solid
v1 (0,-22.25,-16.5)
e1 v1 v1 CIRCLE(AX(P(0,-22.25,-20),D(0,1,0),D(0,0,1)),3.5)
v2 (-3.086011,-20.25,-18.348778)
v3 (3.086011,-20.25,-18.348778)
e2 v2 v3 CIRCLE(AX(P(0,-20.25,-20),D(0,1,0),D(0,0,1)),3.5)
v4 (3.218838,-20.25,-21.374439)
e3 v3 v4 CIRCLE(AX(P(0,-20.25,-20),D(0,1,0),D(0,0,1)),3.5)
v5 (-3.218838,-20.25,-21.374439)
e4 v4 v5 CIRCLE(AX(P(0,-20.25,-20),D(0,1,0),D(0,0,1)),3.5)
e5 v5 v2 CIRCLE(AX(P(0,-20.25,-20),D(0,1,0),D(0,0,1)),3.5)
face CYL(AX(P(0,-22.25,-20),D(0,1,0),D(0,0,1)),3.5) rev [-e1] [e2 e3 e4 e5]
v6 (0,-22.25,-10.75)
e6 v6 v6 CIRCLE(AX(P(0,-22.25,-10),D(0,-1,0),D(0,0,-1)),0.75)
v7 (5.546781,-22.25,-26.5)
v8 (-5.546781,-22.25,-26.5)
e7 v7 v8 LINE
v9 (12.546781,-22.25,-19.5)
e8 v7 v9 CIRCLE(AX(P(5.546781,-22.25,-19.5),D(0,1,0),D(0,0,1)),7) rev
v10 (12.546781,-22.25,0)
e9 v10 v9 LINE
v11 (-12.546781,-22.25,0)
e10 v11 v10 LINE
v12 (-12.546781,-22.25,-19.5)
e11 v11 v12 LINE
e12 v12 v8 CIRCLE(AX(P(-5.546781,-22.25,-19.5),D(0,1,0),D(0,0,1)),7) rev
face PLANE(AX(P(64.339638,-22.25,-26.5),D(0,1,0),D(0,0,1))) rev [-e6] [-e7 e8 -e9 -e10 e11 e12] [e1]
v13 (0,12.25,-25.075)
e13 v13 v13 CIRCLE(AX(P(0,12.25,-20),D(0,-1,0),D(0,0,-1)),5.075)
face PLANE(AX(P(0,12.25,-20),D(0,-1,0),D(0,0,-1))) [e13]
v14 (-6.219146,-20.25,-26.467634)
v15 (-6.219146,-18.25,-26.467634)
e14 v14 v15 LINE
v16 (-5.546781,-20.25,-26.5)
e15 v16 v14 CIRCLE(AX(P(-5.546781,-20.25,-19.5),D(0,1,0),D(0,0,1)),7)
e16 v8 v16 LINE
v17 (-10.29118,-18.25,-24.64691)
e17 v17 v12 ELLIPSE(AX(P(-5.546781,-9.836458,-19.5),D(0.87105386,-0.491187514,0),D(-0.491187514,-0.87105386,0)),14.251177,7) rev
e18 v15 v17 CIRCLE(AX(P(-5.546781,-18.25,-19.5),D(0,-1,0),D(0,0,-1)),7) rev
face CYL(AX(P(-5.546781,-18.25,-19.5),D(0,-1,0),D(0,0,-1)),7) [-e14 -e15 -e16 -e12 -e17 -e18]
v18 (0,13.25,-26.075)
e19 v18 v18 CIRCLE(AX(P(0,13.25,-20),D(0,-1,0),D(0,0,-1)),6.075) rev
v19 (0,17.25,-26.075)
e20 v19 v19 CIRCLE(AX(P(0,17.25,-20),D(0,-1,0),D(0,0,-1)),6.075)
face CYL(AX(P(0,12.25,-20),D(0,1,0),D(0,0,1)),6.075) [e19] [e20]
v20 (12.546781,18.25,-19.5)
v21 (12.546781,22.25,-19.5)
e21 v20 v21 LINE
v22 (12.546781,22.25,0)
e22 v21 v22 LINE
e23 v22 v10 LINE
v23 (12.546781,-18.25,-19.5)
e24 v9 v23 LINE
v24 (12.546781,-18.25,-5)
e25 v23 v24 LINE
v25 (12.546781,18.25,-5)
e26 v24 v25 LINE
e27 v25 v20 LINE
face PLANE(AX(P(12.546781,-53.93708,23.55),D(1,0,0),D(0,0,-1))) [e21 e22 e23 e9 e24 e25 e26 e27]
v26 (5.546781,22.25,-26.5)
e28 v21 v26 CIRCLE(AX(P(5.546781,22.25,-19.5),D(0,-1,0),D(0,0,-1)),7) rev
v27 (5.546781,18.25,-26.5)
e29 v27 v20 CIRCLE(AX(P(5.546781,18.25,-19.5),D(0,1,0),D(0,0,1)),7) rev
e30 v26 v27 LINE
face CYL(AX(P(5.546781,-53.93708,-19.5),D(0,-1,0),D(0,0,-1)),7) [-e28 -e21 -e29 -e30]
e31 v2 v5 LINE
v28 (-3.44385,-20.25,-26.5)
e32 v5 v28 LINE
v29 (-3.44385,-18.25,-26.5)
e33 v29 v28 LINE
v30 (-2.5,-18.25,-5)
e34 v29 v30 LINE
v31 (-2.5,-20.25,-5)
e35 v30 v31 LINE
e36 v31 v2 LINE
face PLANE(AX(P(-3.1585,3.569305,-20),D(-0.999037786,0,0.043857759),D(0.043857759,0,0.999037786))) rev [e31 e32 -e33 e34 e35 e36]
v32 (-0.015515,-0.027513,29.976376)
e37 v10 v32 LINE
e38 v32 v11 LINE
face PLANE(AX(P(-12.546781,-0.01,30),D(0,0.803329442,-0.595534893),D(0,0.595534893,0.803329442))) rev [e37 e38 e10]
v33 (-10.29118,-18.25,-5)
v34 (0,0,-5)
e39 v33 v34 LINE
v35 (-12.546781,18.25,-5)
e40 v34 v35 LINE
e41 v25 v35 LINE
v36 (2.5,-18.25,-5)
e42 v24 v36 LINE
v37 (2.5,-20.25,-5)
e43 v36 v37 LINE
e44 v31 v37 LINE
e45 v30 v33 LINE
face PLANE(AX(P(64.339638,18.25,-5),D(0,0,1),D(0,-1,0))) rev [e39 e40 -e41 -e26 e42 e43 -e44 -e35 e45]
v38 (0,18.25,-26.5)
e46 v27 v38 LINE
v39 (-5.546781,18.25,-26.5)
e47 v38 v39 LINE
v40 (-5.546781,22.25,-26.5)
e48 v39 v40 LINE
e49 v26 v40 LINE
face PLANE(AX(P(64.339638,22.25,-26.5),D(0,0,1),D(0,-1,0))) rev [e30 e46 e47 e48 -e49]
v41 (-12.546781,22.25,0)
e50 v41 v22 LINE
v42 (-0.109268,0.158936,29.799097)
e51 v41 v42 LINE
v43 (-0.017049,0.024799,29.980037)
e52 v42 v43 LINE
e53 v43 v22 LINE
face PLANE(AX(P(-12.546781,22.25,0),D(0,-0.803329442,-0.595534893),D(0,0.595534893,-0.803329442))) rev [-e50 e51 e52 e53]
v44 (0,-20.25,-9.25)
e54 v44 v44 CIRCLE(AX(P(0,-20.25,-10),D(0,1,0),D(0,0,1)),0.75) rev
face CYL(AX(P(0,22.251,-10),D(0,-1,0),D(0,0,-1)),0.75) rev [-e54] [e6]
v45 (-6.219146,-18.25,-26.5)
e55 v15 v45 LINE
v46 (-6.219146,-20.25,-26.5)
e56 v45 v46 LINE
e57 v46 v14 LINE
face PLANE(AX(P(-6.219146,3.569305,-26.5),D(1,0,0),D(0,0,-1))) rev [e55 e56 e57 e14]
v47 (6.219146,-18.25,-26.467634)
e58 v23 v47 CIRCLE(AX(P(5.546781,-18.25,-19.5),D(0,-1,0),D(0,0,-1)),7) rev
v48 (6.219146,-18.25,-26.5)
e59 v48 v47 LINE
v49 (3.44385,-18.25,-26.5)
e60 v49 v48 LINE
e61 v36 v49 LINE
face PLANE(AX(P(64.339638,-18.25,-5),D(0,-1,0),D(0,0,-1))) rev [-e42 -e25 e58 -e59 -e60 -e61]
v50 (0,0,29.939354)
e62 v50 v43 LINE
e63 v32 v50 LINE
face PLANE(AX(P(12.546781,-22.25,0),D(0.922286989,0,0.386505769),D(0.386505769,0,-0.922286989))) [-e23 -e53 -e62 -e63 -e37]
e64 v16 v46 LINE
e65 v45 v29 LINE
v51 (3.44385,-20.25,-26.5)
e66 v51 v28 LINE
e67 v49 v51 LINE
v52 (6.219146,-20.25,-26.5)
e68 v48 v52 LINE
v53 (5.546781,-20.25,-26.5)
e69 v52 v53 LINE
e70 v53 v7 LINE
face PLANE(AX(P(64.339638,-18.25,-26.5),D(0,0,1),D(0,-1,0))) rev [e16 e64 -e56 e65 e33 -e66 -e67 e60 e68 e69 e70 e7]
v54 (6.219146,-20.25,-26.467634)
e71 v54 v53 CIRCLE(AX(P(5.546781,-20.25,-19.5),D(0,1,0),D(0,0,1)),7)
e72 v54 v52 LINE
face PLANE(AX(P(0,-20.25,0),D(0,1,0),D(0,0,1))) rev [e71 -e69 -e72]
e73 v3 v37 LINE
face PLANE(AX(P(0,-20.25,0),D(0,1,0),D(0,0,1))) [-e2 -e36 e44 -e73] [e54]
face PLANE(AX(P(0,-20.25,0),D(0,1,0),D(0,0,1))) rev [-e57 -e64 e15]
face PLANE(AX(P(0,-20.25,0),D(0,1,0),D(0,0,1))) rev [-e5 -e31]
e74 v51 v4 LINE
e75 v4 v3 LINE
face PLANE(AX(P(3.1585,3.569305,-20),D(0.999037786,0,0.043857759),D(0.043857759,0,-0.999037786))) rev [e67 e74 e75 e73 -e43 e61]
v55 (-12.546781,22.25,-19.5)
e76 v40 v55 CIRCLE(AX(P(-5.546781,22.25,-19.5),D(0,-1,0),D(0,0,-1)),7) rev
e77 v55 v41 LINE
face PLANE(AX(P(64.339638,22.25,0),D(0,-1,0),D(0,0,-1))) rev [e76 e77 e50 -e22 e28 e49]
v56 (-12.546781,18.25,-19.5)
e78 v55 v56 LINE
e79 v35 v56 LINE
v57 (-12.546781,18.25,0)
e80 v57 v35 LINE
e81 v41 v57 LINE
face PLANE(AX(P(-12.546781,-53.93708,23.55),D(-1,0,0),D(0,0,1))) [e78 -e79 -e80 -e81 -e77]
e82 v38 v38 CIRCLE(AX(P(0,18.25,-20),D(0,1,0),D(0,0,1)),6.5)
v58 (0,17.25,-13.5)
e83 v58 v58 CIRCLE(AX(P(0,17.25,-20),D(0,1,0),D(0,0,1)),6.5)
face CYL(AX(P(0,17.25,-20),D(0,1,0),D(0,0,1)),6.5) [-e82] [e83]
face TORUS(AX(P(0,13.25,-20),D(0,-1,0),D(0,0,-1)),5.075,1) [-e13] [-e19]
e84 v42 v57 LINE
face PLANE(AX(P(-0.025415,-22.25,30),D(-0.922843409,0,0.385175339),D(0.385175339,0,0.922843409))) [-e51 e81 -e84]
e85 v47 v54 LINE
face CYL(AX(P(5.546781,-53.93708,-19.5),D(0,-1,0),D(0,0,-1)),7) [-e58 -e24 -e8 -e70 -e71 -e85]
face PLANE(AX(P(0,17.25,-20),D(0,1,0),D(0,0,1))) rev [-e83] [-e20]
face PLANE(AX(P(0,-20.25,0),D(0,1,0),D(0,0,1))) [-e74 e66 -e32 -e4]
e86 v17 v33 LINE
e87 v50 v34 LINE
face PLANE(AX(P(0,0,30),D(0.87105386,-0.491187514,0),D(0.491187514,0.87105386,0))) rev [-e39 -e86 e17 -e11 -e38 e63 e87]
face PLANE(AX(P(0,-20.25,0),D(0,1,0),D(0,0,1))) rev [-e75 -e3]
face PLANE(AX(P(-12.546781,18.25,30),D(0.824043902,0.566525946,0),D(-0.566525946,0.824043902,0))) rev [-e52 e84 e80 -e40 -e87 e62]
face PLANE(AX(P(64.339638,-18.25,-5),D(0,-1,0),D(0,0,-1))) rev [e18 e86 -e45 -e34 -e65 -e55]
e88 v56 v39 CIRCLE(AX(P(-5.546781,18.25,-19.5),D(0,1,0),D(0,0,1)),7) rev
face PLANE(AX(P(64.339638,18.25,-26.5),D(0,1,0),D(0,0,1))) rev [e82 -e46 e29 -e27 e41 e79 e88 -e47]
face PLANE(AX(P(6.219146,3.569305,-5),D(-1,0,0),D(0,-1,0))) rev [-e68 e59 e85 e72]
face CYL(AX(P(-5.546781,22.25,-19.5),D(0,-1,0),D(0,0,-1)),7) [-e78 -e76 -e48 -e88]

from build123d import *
from OCP.BRepFilletAPI import BRepFilletAPI_MakeChamfer

# Parameters (mm, degrees)
SKETCH4_W                = 12.46
SKETCH4_H                = 17.25
BOSS_EXTRUDE3_DEPTH      = 6
BOSS_EXTRUDE6_DEPTH      = 7.3
BOSS_EXTRUDE6_DEPTH_BACK = 17.25
SKETCH8_R                = 12.546781182
SKETCH8_R_2              = 11.15
BOSS_EXTRUDE4_DEPTH      = 17.25
SKETCH6_R                = 2
CUT_EXTRUDE1_DEPTH       = 5
CHAMFER1_SIZE            = 0.5
CHAMFER1_SIZE_2          = 0.866025404
SKETCH10_W               = 12.46
SKETCH10_H               = 23.7
CUT_EXTRUDE3_DEPTH       = 17.25
CUT_EXTRUDE4_REACH       = 43.938
SKETCH11_W               = 5
SKETCH11_H               = 3
BOSS_EXTRUDE7_START      = -7.3
BOSS_EXTRUDE7_DEPTH      = 7.3
BOSS_EXTRUDE9_START      = 10
BOSS_EXTRUDE9_DEPTH      = 10
BOSS_EXTRUDE10_DEPTH     = 25.093562364
SKETCH18_W               = 21.5
SKETCH18_H               = 12.438292938
CUT_EXTRUDE5_DEPTH       = 2
CUT_EXTRUDE6_DEPTH       = 58.154608998
CUT_EXTRUDE6_DEPTH_BACK  = 58.154608998
SKETCH19_R               = 3.5
FILLET1_R                = 7
CUT_EXTRUDE7_DEPTH       = 55.97840444
CUT_EXTRUDE7_DEPTH_BACK  = 55.97840444
SKETCH20_W               = 25.093562364
SKETCH20_H               = 36.096781182
BOSS_EXTRUDE11_DEPTH     = 44.5
CUT_EXTRUDE8_DEPTH       = 40.401576339
CUT_EXTRUDE8_DEPTH_BACK  = 40.401576339
CUT_EXTRUDE9_DEPTH       = 40.401576339
CUT_EXTRUDE9_DEPTH_BACK  = 40.401576339
SKETCH24_R               = 6.5
BOSS_EXTRUDE12_DEPTH     = 5
SKETCH25_R               = 6.075
BOSS_EXTRUDE13_DEPTH     = 5
FILLET2_R                = 1
BOSS_EXTRUDE14_DEPTH     = 2
CUT_EXTRUDE10_REACH      = 57.104
SKETCH27_R               = 0.75


with BuildPart() as part:
    # Sketch4 → Boss-Extrude3 (new body)
    with BuildSketch(Plane.XY):
        with Locations((0, -1.35)):
            Rectangle(SKETCH4_W, SKETCH4_H)
    extrude(amount=BOSS_EXTRUDE3_DEPTH)



with BuildPart() as body_2:
    # Sketch8 → Boss-Extrude6 (new, two sides: drawn at the far end of the back side and taken through both)
    with BuildSketch(Plane(origin=(0, -9.975, 0), x_dir=(-1, 0, 0), z_dir=(0, -1, 0)).offset(-BOSS_EXTRUDE6_DEPTH_BACK)):
        with Locations(Location((0, -23.55, 0), (0, 0, 90))):
            Circle(SKETCH8_R)
        with Locations(Location((0, -23.55, 0), (0, 0, 90))):
            Circle(SKETCH8_R_2, mode=Mode.SUBTRACT)
    extrude(amount=BOSS_EXTRUDE6_DEPTH + BOSS_EXTRUDE6_DEPTH_BACK)


with BuildPart() as part_1:
    add(part.part)

    add(body_2.part)  # Boss-Extrude4 merges body 2
    # Sketch5 → Boss-Extrude4 (add)
    with BuildSketch(Plane(origin=(0, 7.275, 0), x_dir=(1, 0, 0), z_dir=(0, 1, 0))):
        with BuildLine():
            Line((12.546781182, -23.55), (12.546781182, 0))
            Line((12.546781182, 0), (6.23, 0))
            Line((6.23, 0), (6.23, -29.7))
            Line((6.23, -29.7), (-6.23, -29.7))
            Line((-6.23, -29.7), (-6.23, 0))
            Line((-6.23, 0), (-12.546781182, 0))
            Line((-12.546781182, 0), (-12.546781182, -23.55))
            ThreePointArc((-12.546781182, -23.55), (0, -36.096781182), (12.546781182, -23.55))
        make_face()
    extrude(amount=-BOSS_EXTRUDE4_DEPTH)

    # Sketch6 → Cut-Extrude1 (cut)
    with BuildSketch(Plane(origin=(0, 7.275, 0), x_dir=(1, 0, 0), z_dir=(0, 1, 0))):
        with Locations(Location((0, -3.5, 0), (0, 0, 270))):
            Circle(SKETCH6_R)
        with Locations(Location((0, -32.2, 0), (0, 0, 270))):
            Circle(SKETCH6_R)
    extrude(amount=-CUT_EXTRUDE1_DEPTH, mode=Mode.SUBTRACT)

    # Chamfer1
    chamfer1_edges_1 = [part_1.edges().sort_by_distance(p)[0] for p in [
        (0, 7.275, 1.5),
    ]]
    chamfer1_side_1 = [part_1.faces().sort_by_distance(p)[0] for p in [
        (0, 7.275, 1.49),
    ]]
    chamfer1_edges_2 = [part_1.edges().sort_by_distance(p)[0] for p in [
        (0, 7.275, 30.2),
    ]]
    chamfer1_side_2 = [part_1.faces().sort_by_distance(p)[0] for p in [
        (0, 7.275, 30.19),
    ]]
    chamfer1 = BRepFilletAPI_MakeChamfer(part_1.part.solid().wrapped)
    for e in chamfer1_edges_1:
        chamfer1.Add(CHAMFER1_SIZE - 0.0001, CHAMFER1_SIZE_2 - 0.0001, e.wrapped, chamfer1_side_1[0].wrapped)
    for e in chamfer1_edges_2:
        chamfer1.Add(CHAMFER1_SIZE - 0.0001, CHAMFER1_SIZE_2 - 0.0001, e.wrapped, chamfer1_side_2[0].wrapped)
    add(Compound.cast(chamfer1.Shape()), mode=Mode.REPLACE)  # a hair under: the kernel refuses the full size

    # Sketch10 → Cut-Extrude3 (cut)
    with BuildSketch(Plane(origin=(0, 7.275, 0), x_dir=(1, 0, 0), z_dir=(0, 1, 0))):
        with Locations((0, -17.85)):
            Rectangle(SKETCH10_W, SKETCH10_H)
    extrude(amount=-CUT_EXTRUDE3_DEPTH, mode=Mode.SUBTRACT)

    # Sketch11 → Cut-Extrude4 (cut, up to next)
    with BuildSketch(Plane.XY.offset(36.096781182), mode=Mode.PRIVATE) as cut_extrude4_sk1:
        with Locations((0, -8.475)):
            Rectangle(SKETCH11_W, SKETCH11_H)
    cut_extrude4_tool1 = extrude(cut_extrude4_sk1.sketch, amount=-CUT_EXTRUDE4_REACH, mode=Mode.PRIVATE) & part_1.part
    add(cut_extrude4_tool1.solids().sort_by_distance((0, -8.475, 36.096781))[0], mode=Mode.SUBTRACT)

    # Sketch13 → Boss-Extrude7 (add)
    with BuildSketch(Plane.XZ.offset(17.275).offset(BOSS_EXTRUDE7_START)):
        with BuildLine():
            Line((-12.546781182, 23.55), (-12.546781182, 0))
            Line((-12.546781182, 0), (12.546781182, 0))
            Line((12.546781182, 0), (12.546781182, 23.55))
            ThreePointArc((12.546781182, 23.55), (0, 11.003218818), (-12.546781182, 23.55))
        make_face()
    extrude(amount=BOSS_EXTRUDE7_DEPTH)

    # Sketch15 → Boss-Extrude9 (add)
    with BuildSketch(Plane(origin=(0, 7.275, 0), x_dir=(1, 0, 0), z_dir=(0, 1, 0)).offset(BOSS_EXTRUDE9_START)):
        with BuildLine():
            Line((-12.546781182, 0), (12.546781182, 0))
            Line((12.546781182, 0), (12.546781182, -23.55))
            ThreePointArc((12.546781182, -23.55), (0, -36.096781182), (-12.546781182, -23.55))
            Line((-12.546781182, -23.55), (-12.546781182, 0))
        make_face()
        with BuildLine():
            Line((-6.23, -0.8), (6.23, -0.8))
            Line((6.23, -0.8), (6.23, -33.5))
            ThreePointArc((6.23, -33.5), (5.937106781, -34.207106781), (5.23, -34.5))
            Line((5.23, -34.5), (-5.23, -34.5))
            ThreePointArc((-5.23, -34.5), (-5.937106781, -34.207106781), (-6.23, -33.5))
            Line((-6.23, -33.5), (-6.23, -0.8))
        make_face(mode=Mode.SUBTRACT)
    extrude(amount=-BOSS_EXTRUDE9_DEPTH)

    # Sketch17 → Boss-Extrude10 (add)
    with BuildSketch(Plane(origin=(-12.546781182, 4.728218818, 0), x_dir=(0, -1, 0), z_dir=(1, 0, 0))):
        Polygon((26.978218818, 26.5), (26.978218818, 0), (-17.521781182, 0), (-17.521781182, 26.5), (-13.521781182, 26.5), (-13.521781182, 5), (22.978218818, 5), (22.978218818, 26.5), align=None)
    extrude(amount=BOSS_EXTRUDE10_DEPTH)

    # Sketch18 → Cut-Extrude5 (cut)
    with BuildSketch(Plane.ZX.offset(-18.25)):
        with Locations((-15.75, 0)):
            Rectangle(SKETCH18_W, SKETCH18_H)
    extrude(amount=-CUT_EXTRUDE5_DEPTH, mode=Mode.SUBTRACT)

    # Sketch19 → Cut-Extrude6 (cut, two sides: drawn at the far end of the back side and taken through both)
    with BuildSketch(Plane.ZX.offset(-20.25).offset(-CUT_EXTRUDE6_DEPTH_BACK)):
        with Locations((-20, 0)):
            Circle(SKETCH19_R)
    extrude(amount=CUT_EXTRUDE6_DEPTH + CUT_EXTRUDE6_DEPTH_BACK, mode=Mode.SUBTRACT)

    # Fillet1
    fillet1_edges = [part_1.edges().sort_by_distance(p)[0] for p in [
        (12.546781182, -20.25, -26.5),
        (-12.546781182, -20.25, -26.5),
        (-12.546781182, 20.25, -26.5),
        (12.546781182, 20.25, -26.5),
    ]]
    fillet(fillet1_edges, radius=FILLET1_R)

    # Sketch20 → Cut-Extrude7 (cut, two sides: drawn at the far end of the back side and taken through both)
    with BuildSketch(Plane(origin=(0, 17.275, 0), x_dir=(1, 0, 0), z_dir=(0, 1, 0)).offset(-CUT_EXTRUDE7_DEPTH_BACK)):
        with Locations((0, -18.048390591)):
            Rectangle(SKETCH20_W, SKETCH20_H)
    extrude(amount=CUT_EXTRUDE7_DEPTH + CUT_EXTRUDE7_DEPTH_BACK, mode=Mode.SUBTRACT)

    # Sketch21 → Boss-Extrude11 (add)
    with BuildSketch(Plane(origin=(0, 22.25, 0), x_dir=(1, 0, 0), z_dir=(0, 1, 0))):
        Polygon((12.546781182, 0), (-0.025415104, -30), (-12.546781182, 0), align=None)
    extrude(amount=-BOSS_EXTRUDE11_DEPTH)

    # Sketch22 → Cut-Extrude8 (cut, two sides: drawn at the far end of the back side and taken through both)
    with BuildSketch(Plane(origin=(0, 0, 0), x_dir=(0, 0, -1), z_dir=(1, 0, 0)).offset(-CUT_EXTRUDE8_DEPTH_BACK)):
        Polygon((0, 22.25), (-30, 0.01), (-30, 22.25), align=None)
        Polygon((0, -22.25), (-30, -22.25), (-30, -0.01), align=None)
    extrude(amount=CUT_EXTRUDE8_DEPTH + CUT_EXTRUDE8_DEPTH_BACK, mode=Mode.SUBTRACT)

    # Sketch23 → Cut-Extrude9 (cut, two sides: drawn at the far end of the back side and taken through both)
    with BuildSketch(Plane(origin=(0, 0, 0), x_dir=(-1, 0, 0), z_dir=(0, 0, -1)).offset(-CUT_EXTRUDE9_DEPTH_BACK)):
        Polygon((12.546781182, 18.25), (0, 0), (12.546781182, -22.25), align=None)
    extrude(amount=CUT_EXTRUDE9_DEPTH + CUT_EXTRUDE9_DEPTH_BACK, mode=Mode.SUBTRACT)

    # Sketch24 → Boss-Extrude12 (add)
    with BuildSketch(Plane(origin=(0, 22.25, 0), x_dir=(1, 0, 0), z_dir=(0, 1, 0))):
        with Locations(Location((0, 20, 0), (0, 0, 270))):
            Circle(SKETCH24_R)
    extrude(amount=-BOSS_EXTRUDE12_DEPTH)

    # Sketch25 → Boss-Extrude13 (add)
    with BuildSketch(Plane.XZ.offset(-17.25)):
        with Locations(Location((0, -20, 0), (0, 0, 270))):
            Circle(SKETCH25_R)
    extrude(amount=BOSS_EXTRUDE13_DEPTH)

    # Fillet2
    fillet2_edges = [part_1.edges().sort_by_distance(p)[0] for p in [
        (0, 12.25, -13.925),
    ]]
    fillet(fillet2_edges, radius=FILLET2_R)

    # Sketch26 → Boss-Extrude14 (add)
    with BuildSketch(Plane(origin=(0, -20.25, 0), x_dir=(1, 0, 0), z_dir=(0, 1, 0))):
        Polygon((-6.219146469, 5), (-2.5, 5), (-3.1585, 20), (-3.44385, 26.5), (-6.219146469, 26.5), align=None)
        Polygon((3.1585, 20), (3.44385, 26.5), (6.219146469, 26.5), (6.219146469, 5), (2.5, 5), align=None)
    extrude(amount=BOSS_EXTRUDE14_DEPTH)

    # Sketch27 → Cut-Extrude10 (cut, up to next)
    with BuildSketch(Plane.XZ.offset(22.25), mode=Mode.PRIVATE) as cut_extrude10_sk1:
        with Locations(Location((0, -10, 0), (0, 0, 270))):
            Circle(SKETCH27_R)
    cut_extrude10_tool1 = extrude(cut_extrude10_sk1.sketch, amount=-CUT_EXTRUDE10_REACH, mode=Mode.PRIVATE) & part_1.part
    add(cut_extrude10_tool1.solids().sort_by_distance((0, -22.25, -10))[0], mode=Mode.SUBTRACT)


solid = part_1.part
